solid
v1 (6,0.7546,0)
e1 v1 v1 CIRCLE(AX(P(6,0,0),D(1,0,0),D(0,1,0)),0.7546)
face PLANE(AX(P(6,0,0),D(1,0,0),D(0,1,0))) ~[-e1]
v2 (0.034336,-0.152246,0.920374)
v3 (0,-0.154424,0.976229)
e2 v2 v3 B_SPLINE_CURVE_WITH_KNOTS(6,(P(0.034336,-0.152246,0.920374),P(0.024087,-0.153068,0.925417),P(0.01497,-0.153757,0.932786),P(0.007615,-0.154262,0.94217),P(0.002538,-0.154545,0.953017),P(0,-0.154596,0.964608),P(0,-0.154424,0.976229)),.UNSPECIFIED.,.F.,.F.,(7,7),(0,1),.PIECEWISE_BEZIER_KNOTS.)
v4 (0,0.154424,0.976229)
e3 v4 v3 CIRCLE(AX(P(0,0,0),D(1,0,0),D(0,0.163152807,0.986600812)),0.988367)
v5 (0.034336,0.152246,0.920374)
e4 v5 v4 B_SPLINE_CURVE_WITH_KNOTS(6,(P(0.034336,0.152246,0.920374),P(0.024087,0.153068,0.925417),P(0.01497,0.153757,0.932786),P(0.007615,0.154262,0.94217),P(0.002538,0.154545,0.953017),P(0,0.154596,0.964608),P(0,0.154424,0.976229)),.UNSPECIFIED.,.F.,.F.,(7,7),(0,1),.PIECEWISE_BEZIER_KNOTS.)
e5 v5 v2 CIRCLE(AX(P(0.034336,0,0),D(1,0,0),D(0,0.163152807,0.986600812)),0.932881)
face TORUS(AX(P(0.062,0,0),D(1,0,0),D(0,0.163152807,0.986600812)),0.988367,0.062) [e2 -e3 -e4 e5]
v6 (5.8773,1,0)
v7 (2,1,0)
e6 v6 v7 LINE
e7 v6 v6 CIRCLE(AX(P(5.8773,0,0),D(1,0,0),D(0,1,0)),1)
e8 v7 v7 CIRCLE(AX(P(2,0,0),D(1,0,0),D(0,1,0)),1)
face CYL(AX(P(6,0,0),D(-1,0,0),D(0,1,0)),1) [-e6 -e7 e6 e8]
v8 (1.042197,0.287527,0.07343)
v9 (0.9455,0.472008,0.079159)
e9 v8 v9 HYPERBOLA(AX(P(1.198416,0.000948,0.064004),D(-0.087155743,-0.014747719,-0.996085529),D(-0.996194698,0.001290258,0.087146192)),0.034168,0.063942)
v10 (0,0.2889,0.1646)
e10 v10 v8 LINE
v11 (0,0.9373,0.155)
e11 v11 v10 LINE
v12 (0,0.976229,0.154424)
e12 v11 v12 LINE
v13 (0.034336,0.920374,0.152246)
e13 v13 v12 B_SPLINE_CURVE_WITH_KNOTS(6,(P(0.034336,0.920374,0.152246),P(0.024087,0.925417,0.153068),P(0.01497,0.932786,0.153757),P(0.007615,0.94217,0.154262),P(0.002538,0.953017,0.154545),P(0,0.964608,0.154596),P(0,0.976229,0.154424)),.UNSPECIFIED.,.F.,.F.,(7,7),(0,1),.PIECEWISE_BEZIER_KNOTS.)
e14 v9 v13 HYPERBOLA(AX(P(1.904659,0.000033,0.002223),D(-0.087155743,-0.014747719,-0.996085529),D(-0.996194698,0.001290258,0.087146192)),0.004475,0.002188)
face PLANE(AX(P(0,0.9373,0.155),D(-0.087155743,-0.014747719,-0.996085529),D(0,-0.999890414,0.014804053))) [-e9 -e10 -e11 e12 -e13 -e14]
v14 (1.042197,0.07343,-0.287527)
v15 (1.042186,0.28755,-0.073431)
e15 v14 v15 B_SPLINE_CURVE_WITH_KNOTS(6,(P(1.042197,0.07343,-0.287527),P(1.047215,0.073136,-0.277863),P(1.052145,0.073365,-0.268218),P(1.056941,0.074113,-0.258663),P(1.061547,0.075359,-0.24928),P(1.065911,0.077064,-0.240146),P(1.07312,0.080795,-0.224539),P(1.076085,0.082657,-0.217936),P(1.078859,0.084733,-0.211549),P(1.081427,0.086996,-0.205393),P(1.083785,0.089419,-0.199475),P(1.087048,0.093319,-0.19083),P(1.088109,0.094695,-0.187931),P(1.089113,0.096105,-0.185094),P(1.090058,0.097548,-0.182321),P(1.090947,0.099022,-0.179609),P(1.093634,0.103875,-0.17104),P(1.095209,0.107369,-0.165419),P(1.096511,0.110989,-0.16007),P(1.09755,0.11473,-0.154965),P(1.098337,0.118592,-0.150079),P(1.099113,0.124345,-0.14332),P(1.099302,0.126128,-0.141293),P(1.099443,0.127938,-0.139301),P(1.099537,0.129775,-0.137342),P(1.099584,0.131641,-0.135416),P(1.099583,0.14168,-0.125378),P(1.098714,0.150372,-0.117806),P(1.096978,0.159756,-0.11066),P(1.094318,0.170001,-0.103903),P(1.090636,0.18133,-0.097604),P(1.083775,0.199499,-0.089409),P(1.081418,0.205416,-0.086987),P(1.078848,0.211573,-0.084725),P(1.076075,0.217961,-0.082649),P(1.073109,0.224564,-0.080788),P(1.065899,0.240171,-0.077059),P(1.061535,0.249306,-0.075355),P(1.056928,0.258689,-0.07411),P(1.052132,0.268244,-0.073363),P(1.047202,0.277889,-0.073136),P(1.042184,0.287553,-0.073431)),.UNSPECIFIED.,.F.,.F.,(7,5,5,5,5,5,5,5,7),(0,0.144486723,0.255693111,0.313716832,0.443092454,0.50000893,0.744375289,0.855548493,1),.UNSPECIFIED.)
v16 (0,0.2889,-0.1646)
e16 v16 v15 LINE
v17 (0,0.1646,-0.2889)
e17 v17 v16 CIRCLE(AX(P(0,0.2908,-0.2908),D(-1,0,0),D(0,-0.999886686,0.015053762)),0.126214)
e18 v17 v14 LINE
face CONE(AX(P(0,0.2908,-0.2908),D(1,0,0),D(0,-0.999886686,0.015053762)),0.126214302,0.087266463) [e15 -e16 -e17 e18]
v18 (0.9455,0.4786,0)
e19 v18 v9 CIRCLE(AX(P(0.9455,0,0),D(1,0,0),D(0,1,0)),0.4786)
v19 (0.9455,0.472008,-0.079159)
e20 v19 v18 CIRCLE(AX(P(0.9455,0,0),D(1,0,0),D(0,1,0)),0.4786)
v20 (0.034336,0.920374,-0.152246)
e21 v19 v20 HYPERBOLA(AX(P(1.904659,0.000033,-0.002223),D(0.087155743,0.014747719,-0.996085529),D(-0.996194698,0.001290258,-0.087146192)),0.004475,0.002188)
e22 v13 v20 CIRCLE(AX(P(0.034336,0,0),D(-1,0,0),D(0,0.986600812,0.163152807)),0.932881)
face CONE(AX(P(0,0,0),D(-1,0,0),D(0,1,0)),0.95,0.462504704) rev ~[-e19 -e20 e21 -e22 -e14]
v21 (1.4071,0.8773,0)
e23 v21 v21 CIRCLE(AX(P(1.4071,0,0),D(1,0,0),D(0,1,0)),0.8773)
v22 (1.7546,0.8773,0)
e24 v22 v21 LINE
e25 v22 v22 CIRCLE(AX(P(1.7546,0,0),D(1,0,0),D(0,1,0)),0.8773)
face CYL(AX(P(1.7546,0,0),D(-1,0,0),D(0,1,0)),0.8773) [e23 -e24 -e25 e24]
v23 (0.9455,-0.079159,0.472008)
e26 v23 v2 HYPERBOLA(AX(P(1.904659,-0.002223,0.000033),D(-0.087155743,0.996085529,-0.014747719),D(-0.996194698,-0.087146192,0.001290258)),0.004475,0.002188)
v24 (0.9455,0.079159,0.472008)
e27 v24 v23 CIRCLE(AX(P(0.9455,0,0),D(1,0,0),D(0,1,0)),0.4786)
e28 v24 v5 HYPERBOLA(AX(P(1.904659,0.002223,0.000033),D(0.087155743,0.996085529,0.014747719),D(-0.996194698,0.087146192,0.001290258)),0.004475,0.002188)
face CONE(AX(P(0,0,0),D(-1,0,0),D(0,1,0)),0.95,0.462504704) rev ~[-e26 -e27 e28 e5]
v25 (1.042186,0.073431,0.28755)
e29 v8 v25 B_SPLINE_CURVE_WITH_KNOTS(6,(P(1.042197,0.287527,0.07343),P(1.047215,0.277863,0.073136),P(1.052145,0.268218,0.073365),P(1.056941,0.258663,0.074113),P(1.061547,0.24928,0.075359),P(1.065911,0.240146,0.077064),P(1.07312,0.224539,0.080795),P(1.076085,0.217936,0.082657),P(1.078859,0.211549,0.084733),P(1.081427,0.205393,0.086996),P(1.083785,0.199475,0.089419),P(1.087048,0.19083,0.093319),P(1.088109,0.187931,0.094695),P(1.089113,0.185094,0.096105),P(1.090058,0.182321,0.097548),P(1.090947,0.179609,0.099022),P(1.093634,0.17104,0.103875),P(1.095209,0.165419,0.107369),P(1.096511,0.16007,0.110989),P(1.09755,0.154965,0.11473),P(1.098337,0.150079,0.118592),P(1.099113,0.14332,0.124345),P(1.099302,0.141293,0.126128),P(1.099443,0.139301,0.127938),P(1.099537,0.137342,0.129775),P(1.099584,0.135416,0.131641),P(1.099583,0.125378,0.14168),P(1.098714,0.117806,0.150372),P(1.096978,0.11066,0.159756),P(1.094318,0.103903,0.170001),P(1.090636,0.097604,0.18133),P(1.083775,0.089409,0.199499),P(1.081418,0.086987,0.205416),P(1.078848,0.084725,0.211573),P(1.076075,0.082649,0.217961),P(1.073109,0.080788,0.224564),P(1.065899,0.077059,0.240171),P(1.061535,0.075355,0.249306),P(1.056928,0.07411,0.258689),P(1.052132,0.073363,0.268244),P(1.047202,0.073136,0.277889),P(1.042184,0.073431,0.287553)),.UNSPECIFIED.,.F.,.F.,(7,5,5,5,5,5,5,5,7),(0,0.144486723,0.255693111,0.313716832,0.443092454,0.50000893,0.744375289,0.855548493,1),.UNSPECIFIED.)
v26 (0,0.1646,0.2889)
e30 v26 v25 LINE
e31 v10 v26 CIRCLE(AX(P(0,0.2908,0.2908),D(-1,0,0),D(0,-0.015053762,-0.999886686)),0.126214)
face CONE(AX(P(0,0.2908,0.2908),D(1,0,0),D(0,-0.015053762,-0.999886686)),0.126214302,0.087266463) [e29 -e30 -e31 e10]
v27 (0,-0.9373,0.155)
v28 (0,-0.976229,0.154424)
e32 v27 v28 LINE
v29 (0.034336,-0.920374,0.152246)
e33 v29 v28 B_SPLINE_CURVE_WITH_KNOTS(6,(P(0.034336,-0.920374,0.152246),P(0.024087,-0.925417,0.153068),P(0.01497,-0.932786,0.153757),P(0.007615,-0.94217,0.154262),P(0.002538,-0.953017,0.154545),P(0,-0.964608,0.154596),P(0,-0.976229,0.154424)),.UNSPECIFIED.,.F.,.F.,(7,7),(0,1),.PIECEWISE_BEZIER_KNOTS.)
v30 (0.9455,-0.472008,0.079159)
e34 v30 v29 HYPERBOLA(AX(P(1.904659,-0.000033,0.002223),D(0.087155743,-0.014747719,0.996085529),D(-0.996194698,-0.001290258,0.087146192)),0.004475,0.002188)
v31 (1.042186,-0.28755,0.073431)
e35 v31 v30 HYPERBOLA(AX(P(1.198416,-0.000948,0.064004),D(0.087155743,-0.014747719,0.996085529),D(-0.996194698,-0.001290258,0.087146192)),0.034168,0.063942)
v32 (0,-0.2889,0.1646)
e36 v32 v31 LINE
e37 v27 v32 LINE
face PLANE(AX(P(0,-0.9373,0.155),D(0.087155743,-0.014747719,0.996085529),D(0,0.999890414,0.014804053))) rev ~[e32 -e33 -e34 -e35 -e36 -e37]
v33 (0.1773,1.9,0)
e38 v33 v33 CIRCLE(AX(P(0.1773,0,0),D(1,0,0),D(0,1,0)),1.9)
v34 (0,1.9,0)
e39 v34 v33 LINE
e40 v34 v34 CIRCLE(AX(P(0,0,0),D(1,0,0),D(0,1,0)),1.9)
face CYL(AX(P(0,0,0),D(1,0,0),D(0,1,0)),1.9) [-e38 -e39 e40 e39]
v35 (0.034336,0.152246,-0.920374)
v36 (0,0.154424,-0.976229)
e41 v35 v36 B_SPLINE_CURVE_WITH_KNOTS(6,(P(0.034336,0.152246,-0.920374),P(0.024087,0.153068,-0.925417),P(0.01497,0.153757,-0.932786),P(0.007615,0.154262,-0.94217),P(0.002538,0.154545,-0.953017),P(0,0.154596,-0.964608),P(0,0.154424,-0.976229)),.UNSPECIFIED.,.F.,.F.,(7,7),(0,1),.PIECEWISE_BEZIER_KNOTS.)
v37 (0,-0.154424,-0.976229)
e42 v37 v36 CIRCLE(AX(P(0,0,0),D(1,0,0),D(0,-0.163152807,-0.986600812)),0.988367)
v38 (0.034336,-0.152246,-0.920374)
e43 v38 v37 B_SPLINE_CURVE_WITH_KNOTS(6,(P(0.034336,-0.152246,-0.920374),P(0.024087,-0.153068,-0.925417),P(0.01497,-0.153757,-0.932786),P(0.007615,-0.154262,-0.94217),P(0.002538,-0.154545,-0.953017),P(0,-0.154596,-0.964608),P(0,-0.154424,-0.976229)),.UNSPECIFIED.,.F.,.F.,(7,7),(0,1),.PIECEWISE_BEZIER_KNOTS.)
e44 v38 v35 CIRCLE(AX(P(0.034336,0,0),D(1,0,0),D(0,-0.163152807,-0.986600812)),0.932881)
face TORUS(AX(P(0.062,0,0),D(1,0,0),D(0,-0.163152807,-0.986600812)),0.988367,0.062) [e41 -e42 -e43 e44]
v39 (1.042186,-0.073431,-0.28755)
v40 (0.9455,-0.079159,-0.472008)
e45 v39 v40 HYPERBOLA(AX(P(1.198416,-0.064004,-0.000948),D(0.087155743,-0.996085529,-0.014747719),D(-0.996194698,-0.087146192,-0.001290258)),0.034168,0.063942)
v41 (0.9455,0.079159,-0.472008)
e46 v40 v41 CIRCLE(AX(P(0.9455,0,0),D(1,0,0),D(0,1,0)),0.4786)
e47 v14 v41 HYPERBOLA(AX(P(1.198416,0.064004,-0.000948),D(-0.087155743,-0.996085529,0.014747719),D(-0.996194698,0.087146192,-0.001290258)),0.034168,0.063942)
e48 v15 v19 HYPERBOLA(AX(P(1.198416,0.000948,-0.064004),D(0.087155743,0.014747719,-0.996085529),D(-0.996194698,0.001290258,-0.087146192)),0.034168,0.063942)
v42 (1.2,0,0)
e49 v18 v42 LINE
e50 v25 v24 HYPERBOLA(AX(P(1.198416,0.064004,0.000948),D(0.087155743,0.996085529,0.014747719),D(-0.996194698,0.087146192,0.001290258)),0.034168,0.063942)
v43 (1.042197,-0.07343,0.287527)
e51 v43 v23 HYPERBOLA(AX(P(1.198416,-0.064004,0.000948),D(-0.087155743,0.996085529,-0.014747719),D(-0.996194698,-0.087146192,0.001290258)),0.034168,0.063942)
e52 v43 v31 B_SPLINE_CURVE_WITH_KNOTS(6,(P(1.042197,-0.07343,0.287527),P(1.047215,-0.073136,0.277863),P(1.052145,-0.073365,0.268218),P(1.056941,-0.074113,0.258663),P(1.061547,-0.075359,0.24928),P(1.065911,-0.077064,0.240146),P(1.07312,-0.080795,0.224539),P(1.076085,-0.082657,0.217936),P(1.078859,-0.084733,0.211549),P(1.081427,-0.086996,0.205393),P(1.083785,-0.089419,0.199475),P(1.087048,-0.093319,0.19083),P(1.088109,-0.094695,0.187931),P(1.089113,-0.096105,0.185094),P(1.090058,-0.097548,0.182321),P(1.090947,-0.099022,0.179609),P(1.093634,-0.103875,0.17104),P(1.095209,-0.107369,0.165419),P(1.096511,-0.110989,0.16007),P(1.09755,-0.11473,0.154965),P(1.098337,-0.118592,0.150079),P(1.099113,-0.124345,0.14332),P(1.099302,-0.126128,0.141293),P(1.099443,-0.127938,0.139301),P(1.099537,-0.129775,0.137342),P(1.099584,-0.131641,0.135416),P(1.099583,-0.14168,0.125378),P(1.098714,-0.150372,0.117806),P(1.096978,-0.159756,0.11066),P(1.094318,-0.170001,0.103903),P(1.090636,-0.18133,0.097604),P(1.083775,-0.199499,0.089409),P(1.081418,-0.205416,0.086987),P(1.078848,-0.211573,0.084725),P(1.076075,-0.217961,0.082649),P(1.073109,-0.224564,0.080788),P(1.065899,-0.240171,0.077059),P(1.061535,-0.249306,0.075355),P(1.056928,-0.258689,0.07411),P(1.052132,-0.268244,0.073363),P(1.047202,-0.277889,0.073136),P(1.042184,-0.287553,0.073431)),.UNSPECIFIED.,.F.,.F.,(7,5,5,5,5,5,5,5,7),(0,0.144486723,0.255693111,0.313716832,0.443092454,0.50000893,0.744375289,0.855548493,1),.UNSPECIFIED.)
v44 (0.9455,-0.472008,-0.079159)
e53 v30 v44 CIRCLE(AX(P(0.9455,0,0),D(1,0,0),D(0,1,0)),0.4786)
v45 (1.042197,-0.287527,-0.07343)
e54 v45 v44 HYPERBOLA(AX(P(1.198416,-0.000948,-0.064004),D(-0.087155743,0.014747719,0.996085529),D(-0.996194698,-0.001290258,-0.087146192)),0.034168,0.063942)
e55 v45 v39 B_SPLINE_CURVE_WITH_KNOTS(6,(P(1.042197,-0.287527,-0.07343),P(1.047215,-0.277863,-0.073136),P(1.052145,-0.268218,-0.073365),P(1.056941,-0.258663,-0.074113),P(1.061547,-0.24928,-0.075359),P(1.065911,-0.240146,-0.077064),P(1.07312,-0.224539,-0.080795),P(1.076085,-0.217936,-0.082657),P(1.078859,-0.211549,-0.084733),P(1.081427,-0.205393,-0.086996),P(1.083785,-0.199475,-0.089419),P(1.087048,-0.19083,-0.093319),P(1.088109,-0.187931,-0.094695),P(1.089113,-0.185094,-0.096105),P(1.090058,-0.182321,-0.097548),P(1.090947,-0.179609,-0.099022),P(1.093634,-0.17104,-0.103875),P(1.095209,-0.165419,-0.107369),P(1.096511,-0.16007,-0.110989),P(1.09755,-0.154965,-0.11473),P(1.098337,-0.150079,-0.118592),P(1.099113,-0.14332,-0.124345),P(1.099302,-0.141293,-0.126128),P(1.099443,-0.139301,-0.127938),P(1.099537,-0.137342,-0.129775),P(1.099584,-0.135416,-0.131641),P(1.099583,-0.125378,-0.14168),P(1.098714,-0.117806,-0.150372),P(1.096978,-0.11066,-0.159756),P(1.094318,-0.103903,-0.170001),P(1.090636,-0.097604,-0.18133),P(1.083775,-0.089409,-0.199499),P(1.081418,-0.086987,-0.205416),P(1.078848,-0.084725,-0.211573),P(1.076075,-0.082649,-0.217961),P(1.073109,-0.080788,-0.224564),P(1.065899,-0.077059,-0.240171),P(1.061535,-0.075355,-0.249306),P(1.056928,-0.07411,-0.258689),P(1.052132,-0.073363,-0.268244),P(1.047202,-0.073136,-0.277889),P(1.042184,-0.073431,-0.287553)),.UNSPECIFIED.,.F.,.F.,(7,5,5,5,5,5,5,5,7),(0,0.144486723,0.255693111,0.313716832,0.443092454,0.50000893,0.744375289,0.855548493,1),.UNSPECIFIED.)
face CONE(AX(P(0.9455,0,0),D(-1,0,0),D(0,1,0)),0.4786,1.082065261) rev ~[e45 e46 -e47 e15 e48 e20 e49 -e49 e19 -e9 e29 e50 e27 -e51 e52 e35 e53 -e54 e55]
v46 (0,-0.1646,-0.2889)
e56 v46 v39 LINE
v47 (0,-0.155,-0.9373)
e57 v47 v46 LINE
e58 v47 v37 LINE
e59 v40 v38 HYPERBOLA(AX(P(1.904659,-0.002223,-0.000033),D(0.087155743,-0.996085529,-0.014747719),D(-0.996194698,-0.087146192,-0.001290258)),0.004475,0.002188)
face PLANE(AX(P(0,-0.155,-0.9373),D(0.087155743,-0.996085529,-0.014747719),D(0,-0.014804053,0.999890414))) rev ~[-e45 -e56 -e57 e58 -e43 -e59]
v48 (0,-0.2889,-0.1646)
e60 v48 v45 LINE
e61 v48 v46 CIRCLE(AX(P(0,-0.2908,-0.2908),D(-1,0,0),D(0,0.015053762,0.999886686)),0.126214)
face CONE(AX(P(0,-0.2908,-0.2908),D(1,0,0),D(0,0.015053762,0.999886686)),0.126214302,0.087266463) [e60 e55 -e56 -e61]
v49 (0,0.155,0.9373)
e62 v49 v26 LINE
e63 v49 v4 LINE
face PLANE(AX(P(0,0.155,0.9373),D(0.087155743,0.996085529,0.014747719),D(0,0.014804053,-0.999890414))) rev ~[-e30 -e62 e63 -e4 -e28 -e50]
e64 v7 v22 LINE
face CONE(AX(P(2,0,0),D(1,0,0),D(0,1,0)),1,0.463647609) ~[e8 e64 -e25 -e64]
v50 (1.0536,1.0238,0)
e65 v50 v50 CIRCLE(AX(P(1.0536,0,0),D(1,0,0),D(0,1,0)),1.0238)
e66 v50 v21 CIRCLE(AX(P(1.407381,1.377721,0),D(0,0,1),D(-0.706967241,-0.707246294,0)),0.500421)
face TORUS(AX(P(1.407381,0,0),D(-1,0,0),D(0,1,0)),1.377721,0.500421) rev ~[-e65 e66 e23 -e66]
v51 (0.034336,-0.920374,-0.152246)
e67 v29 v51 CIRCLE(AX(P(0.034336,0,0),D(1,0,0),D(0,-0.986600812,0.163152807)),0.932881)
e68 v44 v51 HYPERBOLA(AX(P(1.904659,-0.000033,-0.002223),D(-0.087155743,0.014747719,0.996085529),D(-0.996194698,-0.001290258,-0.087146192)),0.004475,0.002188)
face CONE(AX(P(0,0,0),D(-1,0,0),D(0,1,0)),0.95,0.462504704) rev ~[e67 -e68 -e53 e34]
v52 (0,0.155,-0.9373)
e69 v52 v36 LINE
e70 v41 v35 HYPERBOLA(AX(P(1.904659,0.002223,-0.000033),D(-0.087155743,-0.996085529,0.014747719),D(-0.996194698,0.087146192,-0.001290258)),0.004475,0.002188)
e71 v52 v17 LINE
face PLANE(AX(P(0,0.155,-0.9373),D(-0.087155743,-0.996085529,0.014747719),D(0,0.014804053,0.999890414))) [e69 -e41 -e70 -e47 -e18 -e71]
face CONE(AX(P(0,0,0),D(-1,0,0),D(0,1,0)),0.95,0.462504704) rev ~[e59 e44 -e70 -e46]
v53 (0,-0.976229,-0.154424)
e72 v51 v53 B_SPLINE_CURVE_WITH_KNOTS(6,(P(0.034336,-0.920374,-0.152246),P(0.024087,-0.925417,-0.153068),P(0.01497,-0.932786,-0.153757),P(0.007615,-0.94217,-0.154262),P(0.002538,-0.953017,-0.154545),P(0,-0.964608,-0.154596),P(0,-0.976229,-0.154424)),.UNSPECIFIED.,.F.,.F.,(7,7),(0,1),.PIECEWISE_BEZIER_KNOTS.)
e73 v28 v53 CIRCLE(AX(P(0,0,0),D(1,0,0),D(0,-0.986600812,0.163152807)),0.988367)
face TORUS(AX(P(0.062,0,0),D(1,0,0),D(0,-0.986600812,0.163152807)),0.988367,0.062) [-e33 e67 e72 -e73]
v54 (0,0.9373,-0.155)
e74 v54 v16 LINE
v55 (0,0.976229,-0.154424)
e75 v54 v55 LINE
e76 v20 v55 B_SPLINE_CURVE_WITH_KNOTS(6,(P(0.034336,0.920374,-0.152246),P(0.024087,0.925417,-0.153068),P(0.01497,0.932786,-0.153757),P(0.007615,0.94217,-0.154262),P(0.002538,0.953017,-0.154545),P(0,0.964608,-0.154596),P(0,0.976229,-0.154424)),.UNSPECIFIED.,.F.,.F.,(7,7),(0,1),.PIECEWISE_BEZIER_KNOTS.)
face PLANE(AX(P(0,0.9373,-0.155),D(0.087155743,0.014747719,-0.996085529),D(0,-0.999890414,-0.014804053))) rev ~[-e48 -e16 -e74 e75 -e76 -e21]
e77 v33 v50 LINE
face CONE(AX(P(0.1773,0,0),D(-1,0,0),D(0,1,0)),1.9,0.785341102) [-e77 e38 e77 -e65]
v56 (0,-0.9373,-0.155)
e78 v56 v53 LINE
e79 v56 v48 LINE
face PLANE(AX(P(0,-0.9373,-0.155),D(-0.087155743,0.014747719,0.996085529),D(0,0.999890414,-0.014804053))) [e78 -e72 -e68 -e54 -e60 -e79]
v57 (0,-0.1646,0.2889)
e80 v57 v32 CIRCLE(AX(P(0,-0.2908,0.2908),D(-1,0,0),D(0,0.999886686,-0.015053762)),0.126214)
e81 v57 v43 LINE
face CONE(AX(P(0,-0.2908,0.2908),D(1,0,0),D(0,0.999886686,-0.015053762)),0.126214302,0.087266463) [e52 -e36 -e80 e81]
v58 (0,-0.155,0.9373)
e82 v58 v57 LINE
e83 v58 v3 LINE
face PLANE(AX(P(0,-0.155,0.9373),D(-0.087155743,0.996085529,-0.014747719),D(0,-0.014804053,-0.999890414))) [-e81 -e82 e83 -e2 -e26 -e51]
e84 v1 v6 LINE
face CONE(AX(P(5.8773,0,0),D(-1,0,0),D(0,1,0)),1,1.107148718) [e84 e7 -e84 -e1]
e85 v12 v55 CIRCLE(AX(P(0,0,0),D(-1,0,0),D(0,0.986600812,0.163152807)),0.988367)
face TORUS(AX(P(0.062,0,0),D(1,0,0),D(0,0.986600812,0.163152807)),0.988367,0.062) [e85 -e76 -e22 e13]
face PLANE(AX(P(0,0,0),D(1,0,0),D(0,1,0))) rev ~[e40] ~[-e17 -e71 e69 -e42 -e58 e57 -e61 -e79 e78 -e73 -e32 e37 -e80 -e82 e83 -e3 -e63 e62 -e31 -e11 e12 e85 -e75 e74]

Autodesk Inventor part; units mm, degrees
ref_plane "YZ Plane" through (0, 0, 0) normal (1, 0, 0) x (0, 1, 0)
ref_plane "XZ Plane" through (0, 0, 0) normal (0, 1, 0) x (-1, 0, 0)
sketch "Sketch1" plane through (0, 0, 0) normal (0, 0, 1) x (1, 0, 0)
  line L0 (1.2, 0) -> (6, 0)
  line L1 (6, 0) -> (6, 1)
  line L2 (6, 1) -> (2, 1)
  line L3 (2, 1) -> (1.7546, 0.8773)
  line L4 (1.7546, 0.8773) -> (1.4071, 0.8773)
  line L5 (0, 1.9) -> (0, 0.95)
  line L6 (0, 0.95) -> (0.9455, 0.4786)
  line L7 (0.9455, 0.4786) -> (1.2, 0)
  line L8 (-1.2, 0) -> (7.2, 0) projected
  line L9 (0, -0.38) -> (0, 2.28) projected
  line L10 (0, 1.9) -> (0.1773, 1.9)
  line L11 (0.1773, 1.9) -> (1.0536, 1.0238)
  line L12 (2, 1) -> (1.0773, 1) construction
  arc A0 (1.0536, 1.0238) -> (1.4071, 0.8773) centre (1.4071, 1.3773) ccw
  point P0 (1.2, 0.8773)
  dimension "d1" = 4
  dimension "d2" = 2
  dimension "d3" = 1.7546
  dimension "d4" = 1.9
  dimension "d5" = 26.5
  dimension "d6" = 62
  dimension "d7" = 1.2
  dimension "d8" = 0.2454
  dimension "d12" = 3.8
  dimension "d13" = 45
  dimension "d15" = 6
  dimension "d24" = 1.2
  dimension "d93" = 0.5
revolve "Body" add sketch "Sketch1" angle 360 about axis through (1.2, 0, 0) along (1, 0, 0) contours L7 L6 L5 L10 L11 A0 L4 L3 L2 L1 L0
sketch "Sketch2" plane through (0, 0, 0) normal (-1, 0, 0) x (0, 0, 1)
  line L0 (0, 0.95) -> (0, 0) construction
  line L1 (0, 0) -> (0.95, 0) construction
  arc A0 (0.285, 0) -> (0, 0.285) centre (0, 0) ccw construction
  arc A1 (0.3325, 0) -> (0, 0.3325) centre (0, 0) ccw construction
  arc A2 (0.9373, 0.155) -> (0.155, 0.9373) centre (0, 0) ccw
  line L2 (0, 0) -> (0.6718, 0.6718) construction
  line L3 (0.155, 0.9373) -> (0.1646, 0.2889)
  line L4 (0.9373, 0.155) -> (0.2889, 0.1646)
  arc A3 (0.155, 0.9373) -> (0, 0.95) centre (0, 0) ccw
  arc A4 (0.95, 0) -> (0.9373, 0.155) centre (0, 0) ccw
  line L5 (0, -2.66) -> (0, 2.66) projected
  line L6 (-2.66, 0) -> (2.66, 0) projected
  arc A5 (0.155, -0.9373) -> (0.9373, -0.155) centre (0, 0) ccw
  line L7 (0.155, -0.9373) -> (0.1646, -0.2889)
  line L8 (0.9373, -0.155) -> (0.2889, -0.1646)
  arc A6 (0, -0.95) -> (0.155, -0.9373) centre (0, 0) ccw
  arc A7 (0.9373, -0.155) -> (0.95, 0) centre (0, 0) ccw
  arc A8 (-0.155, 0.9373) -> (-0.9373, 0.155) centre (0, 0) ccw
  line L9 (-0.155, 0.9373) -> (-0.1646, 0.2889)
  line L10 (-0.9373, 0.155) -> (-0.2889, 0.1646)
  arc A9 (0, 0.95) -> (-0.155, 0.9373) centre (0, 0) ccw
  arc A10 (-0.9373, 0.155) -> (-0.95, 0) centre (0, 0) ccw
  arc A11 (-0.155, -0.9373) -> (0, -0.95) centre (0, 0) ccw
  arc A12 (-0.9373, -0.155) -> (-0.155, -0.9373) centre (0, 0) ccw
  arc A13 (-0.95, 0) -> (-0.9373, -0.155) centre (0, 0) ccw
  line L11 (-0.9373, -0.155) -> (-0.2889, -0.1646)
  line L12 (-0.155, -0.9373) -> (-0.1646, -0.2889)
  arc A14 (0.1646, 0.2889) -> (0.2889, 0.1646) centre (0.2908, 0.2908) ccw
  arc A15 (0.2889, -0.1646) -> (0.1646, -0.2889) centre (0.2908, -0.2908) ccw
  arc A16 (-0.2889, 0.1646) -> (-0.1646, 0.2889) centre (-0.2908, 0.2908) ccw
  arc A17 (-0.1646, -0.2889) -> (-0.2889, -0.1646) centre (-0.2908, -0.2908) ccw
  point P0 (0.6718, -0.6718)
  point P1 (-0.6718, 0.6718)
  point P2 (-0.6718, -0.6718)
  dimension "d17" = 0.57
  dimension "d18" = 0.665
  dimension "d19" = 1.9
  dimension "d20" = 45
  dimension "d21" = 0.155
extrude "Slot" add sketch "Sketch2" against normal up to next draft 5 contours L4 A14 L3 A2 | A5 L7 A15 L8 | L9 A16 L10 A8 | A12 L11 A17 L12
fillet "Fillet1" radius 0.062 4 edges at (0, 0.95, 0) (0, 0, -0.95) (0, -0.95, 0) (0, 0, 0.95)
thread "Thread" size "M2x0.4" class "6g" standard "ISO Metric profile" length 4
chamfer "Chamfer1" distance 0.2454 distance2 0.1227 1 edges at (6, -1, 0) measured on face at (6, 0.3275, -0.4215)
ref_plane "Work Plane2" through (3.35, 0, 0) normal (0, 0, -1) x (1, 0, 0)
equation "\"d1\" = GEL"
equation "\"d2\" = GD"
equation "\"d3\" = BDM"
equation "\"d4\" = SDM"
equation "\"d7\" = INTI"
equation "\"d8\" = GAL"
equation "\"d12\" = KOD"
equation "\"d13\" = 0.5 * SEWI"
equation "\"d15\" = NLG"
equation "\"d24\" = KOH"
equation "\"d93\" = R"
equation "\"d17\" = 0.3 * SDM"
equation "\"d18\" = 0.35 * SDM"
equation "\"d19\" = SDM"
equation "\"d21\" = 0.5 * SBR"
equation "\"d23\" = 0.2 * SBR"
equation "\"d10\" = GEL"
equation "\"d25\" = -0.5 * SPD + 0.5 * GD"
equation "\"d26\" = 0.5 * GAL"
equation "\"NLG\" = 6"
equation "\"GEL\" = 4"
equation "\"GAL\" = 0.61345 * PTC"
equation "\"SPD\" = NND - 1.2269 * PTC"
equation "\"KOD\" = 3.8"
equation "\"KOH\" = 1.2"
equation "\"SBR\" = 0.31"
equation "\"INTI\" = 1.2"
equation "\"SDM\" = 1.9"
equation "\"GD\" = NND"
equation "\"BDM\" = NND - GAL"
equation "\"SEWI\" = 90deg"
equation "\"d9\" = SDM"
equation "\"R\" = 0.5"
equation "\"GUL\" = 0.61345 * PTC"
equation "\"TOA\" = 30deg"
equation "\"EPV\" = 2.2"
equation "\"THREADDIA\" = 2"
equation "\"PTC\" = 0.4"
equation "\"NND\" = 2"
equation "\"GD1\" = THREADDIA - 1.2269 * PTC"
properties part number "ISO 7046-1  - M2 x 6 - 4.8 - H" material "Steel"
